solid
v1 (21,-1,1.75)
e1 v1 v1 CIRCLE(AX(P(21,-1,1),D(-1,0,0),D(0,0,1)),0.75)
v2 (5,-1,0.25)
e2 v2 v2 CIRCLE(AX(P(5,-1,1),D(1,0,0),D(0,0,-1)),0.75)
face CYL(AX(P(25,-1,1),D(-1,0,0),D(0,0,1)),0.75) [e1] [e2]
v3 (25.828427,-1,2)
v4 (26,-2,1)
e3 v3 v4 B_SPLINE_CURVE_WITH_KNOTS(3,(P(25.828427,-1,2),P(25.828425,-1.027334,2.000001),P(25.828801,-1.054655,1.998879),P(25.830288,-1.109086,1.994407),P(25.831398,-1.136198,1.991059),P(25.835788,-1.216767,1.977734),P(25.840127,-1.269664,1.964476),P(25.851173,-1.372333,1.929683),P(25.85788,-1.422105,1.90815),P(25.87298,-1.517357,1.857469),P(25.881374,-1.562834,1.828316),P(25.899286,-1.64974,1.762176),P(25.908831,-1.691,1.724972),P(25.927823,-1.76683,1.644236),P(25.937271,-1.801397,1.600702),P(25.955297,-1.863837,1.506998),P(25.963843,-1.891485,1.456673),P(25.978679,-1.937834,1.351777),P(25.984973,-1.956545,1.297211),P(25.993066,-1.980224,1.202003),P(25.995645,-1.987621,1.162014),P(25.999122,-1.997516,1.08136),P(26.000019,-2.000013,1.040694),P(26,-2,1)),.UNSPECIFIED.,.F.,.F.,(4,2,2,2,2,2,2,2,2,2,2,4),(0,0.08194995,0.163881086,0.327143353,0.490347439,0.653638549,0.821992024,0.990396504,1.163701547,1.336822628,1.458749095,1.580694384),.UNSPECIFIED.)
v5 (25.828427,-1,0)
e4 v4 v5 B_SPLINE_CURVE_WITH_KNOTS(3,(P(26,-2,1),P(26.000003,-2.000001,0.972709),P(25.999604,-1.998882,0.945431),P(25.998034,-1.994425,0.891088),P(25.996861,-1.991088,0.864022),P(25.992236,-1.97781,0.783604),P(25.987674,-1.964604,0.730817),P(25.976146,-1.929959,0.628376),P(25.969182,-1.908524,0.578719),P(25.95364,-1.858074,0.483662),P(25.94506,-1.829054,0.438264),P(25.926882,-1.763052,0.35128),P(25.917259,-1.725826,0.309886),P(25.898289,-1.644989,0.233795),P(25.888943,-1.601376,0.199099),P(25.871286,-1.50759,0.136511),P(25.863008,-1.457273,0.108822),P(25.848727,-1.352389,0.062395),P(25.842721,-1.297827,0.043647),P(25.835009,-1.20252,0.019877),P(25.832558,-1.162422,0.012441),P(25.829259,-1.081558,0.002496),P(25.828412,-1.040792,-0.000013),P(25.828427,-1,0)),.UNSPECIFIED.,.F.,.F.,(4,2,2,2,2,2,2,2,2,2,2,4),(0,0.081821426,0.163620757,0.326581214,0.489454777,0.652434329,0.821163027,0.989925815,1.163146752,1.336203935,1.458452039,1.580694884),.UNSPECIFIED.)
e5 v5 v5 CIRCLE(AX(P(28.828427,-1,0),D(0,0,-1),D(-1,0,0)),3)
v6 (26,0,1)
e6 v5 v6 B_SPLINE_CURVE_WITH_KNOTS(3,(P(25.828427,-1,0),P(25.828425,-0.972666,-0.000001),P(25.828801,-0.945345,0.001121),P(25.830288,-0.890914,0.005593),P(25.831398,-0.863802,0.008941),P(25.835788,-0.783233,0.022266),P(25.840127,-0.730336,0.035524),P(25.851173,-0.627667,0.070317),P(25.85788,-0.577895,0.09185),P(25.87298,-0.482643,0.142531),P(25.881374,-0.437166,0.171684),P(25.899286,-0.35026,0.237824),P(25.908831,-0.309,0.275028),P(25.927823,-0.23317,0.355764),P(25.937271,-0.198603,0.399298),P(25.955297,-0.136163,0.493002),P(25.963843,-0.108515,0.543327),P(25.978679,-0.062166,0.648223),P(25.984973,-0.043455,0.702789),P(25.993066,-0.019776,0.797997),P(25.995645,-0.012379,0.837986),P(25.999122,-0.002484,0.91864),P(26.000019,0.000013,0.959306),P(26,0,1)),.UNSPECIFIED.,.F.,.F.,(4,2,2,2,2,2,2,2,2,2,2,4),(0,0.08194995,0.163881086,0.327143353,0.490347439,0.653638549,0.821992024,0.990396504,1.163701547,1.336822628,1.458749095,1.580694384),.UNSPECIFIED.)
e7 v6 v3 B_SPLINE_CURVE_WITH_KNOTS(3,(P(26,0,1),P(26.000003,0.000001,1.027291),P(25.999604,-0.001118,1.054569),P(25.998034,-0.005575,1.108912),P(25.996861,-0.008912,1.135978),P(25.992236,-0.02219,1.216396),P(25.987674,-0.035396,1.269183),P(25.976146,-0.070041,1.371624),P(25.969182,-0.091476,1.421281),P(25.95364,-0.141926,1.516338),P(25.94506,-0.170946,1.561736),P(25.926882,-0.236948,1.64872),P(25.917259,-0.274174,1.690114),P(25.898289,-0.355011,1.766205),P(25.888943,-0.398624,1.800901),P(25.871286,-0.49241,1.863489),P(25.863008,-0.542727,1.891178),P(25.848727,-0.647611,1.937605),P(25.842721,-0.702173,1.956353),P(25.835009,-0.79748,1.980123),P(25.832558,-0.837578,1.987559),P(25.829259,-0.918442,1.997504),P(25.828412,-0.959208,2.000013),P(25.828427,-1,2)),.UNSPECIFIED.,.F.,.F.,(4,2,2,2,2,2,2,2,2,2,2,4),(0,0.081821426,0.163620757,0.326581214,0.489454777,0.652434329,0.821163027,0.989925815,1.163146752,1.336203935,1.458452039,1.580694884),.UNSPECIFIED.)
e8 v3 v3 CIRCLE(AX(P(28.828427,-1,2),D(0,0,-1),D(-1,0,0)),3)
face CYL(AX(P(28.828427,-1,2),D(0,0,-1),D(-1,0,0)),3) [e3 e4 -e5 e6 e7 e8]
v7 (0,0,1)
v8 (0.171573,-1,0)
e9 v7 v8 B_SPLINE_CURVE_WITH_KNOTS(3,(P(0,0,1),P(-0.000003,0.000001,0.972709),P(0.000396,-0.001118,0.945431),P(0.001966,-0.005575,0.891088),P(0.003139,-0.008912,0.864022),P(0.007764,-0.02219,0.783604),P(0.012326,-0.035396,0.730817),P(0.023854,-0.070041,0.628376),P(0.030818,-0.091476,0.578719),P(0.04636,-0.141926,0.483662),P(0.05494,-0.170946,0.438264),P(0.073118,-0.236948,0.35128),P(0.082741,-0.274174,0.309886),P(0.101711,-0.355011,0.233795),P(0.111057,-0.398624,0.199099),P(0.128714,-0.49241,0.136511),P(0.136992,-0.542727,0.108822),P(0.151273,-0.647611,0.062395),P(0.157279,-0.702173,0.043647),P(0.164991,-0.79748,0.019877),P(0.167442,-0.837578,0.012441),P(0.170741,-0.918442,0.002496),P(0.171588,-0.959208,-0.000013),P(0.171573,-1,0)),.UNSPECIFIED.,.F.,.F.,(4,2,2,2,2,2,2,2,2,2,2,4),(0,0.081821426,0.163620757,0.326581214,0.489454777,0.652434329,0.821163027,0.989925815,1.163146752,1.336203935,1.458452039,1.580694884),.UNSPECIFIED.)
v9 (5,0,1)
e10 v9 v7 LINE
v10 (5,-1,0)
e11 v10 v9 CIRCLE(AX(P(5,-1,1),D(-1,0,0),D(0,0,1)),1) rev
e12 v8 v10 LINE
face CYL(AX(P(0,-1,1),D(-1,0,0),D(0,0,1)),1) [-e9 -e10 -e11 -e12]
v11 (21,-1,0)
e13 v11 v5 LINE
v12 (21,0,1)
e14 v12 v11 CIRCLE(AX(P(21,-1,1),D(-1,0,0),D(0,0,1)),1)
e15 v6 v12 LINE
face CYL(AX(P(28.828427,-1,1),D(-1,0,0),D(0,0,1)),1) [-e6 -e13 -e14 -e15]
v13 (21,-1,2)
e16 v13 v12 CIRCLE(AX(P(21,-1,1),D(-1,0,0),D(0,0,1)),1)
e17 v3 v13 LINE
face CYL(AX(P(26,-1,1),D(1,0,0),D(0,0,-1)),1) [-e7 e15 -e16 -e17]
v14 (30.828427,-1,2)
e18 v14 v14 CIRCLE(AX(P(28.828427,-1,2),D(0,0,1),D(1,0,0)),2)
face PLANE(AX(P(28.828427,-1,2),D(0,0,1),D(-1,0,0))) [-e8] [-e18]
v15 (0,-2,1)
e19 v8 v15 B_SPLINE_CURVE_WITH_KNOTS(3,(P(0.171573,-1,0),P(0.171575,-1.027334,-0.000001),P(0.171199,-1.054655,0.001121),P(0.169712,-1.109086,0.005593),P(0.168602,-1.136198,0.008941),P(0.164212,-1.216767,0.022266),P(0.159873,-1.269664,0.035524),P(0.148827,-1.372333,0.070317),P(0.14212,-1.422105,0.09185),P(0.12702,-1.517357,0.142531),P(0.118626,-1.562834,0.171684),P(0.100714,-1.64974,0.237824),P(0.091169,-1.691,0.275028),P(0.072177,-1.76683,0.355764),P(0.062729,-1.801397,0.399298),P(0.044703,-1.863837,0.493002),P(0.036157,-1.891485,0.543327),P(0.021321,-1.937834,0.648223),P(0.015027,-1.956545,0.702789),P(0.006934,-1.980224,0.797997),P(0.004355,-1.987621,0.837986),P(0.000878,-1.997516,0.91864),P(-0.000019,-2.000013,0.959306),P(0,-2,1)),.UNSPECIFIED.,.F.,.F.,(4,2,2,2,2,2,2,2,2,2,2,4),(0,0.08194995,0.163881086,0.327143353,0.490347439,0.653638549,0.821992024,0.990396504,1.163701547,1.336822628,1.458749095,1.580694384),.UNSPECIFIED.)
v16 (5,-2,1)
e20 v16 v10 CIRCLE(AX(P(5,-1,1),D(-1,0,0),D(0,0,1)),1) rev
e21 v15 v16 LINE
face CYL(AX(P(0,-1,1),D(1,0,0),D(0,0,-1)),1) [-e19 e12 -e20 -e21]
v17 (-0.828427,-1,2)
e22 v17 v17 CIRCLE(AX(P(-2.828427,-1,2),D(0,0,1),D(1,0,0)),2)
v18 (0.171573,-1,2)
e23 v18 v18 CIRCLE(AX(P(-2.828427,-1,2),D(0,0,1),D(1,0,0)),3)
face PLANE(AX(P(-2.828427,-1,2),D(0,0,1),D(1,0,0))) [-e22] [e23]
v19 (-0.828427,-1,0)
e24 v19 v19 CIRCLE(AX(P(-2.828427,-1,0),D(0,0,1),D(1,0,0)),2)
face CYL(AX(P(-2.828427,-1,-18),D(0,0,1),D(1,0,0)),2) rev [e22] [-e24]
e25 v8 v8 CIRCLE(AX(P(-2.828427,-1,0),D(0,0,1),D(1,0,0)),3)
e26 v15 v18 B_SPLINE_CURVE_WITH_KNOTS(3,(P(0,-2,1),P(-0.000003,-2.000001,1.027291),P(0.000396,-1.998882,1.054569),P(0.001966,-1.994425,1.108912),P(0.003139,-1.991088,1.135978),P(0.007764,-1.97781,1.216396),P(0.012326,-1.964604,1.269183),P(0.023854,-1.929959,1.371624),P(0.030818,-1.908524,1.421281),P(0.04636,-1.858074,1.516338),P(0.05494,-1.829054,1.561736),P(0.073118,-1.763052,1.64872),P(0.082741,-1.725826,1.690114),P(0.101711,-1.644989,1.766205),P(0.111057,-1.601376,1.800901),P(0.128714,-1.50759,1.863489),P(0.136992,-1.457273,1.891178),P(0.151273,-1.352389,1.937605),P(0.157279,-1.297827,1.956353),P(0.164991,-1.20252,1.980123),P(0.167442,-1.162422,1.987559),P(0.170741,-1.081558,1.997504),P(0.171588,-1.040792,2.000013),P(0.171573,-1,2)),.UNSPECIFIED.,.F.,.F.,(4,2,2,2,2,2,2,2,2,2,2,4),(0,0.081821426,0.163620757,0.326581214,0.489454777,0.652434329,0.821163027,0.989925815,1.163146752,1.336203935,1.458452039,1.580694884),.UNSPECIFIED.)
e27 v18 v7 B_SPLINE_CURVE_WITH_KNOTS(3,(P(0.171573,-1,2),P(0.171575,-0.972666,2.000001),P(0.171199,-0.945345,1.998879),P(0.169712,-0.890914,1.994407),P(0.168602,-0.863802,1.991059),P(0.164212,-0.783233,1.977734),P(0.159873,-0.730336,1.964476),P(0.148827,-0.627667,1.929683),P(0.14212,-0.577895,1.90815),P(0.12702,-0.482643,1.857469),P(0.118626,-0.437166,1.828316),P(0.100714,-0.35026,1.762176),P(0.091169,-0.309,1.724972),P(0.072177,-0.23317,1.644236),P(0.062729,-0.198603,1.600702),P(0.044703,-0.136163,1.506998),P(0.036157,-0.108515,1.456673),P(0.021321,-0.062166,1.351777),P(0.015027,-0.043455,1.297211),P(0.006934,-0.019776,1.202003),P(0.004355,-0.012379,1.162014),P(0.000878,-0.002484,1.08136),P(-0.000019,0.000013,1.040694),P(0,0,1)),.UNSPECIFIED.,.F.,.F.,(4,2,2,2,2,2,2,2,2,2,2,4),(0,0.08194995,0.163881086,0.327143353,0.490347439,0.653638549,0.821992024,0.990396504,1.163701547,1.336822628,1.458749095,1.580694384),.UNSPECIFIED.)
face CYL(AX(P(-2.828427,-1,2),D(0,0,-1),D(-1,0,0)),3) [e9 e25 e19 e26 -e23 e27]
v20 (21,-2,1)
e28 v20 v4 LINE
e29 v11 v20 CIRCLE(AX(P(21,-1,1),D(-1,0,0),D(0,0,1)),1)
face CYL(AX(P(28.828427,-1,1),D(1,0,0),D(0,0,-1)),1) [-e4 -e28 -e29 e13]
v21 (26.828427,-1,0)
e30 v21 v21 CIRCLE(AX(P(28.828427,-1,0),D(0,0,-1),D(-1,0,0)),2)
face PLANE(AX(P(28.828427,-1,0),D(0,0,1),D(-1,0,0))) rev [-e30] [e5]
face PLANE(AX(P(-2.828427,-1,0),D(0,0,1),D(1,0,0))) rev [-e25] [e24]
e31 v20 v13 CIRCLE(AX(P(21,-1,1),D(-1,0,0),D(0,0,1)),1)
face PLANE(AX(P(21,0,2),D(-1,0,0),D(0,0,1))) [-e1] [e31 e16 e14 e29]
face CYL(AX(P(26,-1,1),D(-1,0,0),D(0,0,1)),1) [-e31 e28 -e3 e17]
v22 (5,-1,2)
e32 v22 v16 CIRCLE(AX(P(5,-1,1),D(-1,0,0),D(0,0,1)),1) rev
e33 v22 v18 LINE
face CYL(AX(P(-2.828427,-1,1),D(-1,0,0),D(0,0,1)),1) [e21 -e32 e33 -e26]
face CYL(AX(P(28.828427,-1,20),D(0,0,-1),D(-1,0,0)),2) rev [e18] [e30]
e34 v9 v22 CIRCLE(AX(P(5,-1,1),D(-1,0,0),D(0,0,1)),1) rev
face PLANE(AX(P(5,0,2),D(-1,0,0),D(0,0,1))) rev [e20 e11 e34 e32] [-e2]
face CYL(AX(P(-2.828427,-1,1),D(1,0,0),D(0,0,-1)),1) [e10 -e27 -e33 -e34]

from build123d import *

# Parameters (mm, degrees)
EXTRUDE_1_DEPTH     = 2
SKETCH_3_R          = 0.75
EXTRUDE_2_DEPTH     = 20
SKETCH_6_R          = 2
CUT_EXTRUDE_1_DEPTH = 20
SKETCH_7_R          = 2
CUT_EXTRUDE_2_DEPTH = 20
FILLET_2_R          = 1
FILLET_3_R          = 1


with BuildPart() as part:
    # 草图2 → 凸台-拉伸1 (new body)
    with BuildSketch(Plane.XY):
        with BuildLine():
            Line((0, 0), (5, 0))
            Line((5, 0), (5, -2))
            Line((5, -2), (0, -2))
            ThreePointArc((0, -2), (-5.828427125, -1), (0, 0))
        make_face()
    extrude_1 = extrude(amount=EXTRUDE_1_DEPTH)

    # 草图3 → 凸台-拉伸2 (add)
    with BuildSketch(Plane(origin=(5, 0, 0), x_dir=(0, 0, -1), z_dir=(1, 0, 0))):
        with Locations((-1, -1)):
            Circle(SKETCH_3_R)
    extrude(amount=EXTRUDE_2_DEPTH)

    # 草图6 → 切除-拉伸1 (cut)
    with BuildSketch(Plane.XY.offset(2)):
        with Locations((-2.828427125, -1)):
            Circle(SKETCH_6_R)
    extrude(amount=-CUT_EXTRUDE_1_DEPTH, mode=Mode.SUBTRACT)

    # 镜向9: 凸台-拉伸1 across plane
    add(extrude_1.mirror(Plane(origin=(13, 0, 0), x_dir=(0, 0, 1), z_dir=(1, 0, 0))))

    # 草图7 → 切除-拉伸2 (cut)
    with BuildSketch(Plane(origin=(0, 0, 0), x_dir=(-1, 0, 0), z_dir=(0, 0, -1))):
        with Locations((-28.828427125, -1)):
            Circle(SKETCH_7_R)
    extrude(amount=-CUT_EXTRUDE_2_DEPTH, mode=Mode.SUBTRACT)

    # 圆角2
    fillet_2_edges = [part.edges().sort_by_distance(p)[0] for p in [
        (2.5, -2, 2),
        (2.5, -2, 0),
        (2.5, 0, 0),
        (2.5, 0, 2),
    ]]
    fillet(fillet_2_edges, radius=FILLET_2_R - 0.0001)  # a hair under: the kernel refuses the full size

    # 圆角3
    fillet_3_edges = [part.edges().sort_by_distance(p)[0] for p in [
        (23.5, -2, 2),
        (23.5, -2, 0),
        (23.5, 0, 0),
        (23.5, 0, 2),
    ]]
    fillet(fillet_3_edges, radius=FILLET_3_R - 0.0001)  # a hair under: the kernel refuses the full size


solid = part.part
